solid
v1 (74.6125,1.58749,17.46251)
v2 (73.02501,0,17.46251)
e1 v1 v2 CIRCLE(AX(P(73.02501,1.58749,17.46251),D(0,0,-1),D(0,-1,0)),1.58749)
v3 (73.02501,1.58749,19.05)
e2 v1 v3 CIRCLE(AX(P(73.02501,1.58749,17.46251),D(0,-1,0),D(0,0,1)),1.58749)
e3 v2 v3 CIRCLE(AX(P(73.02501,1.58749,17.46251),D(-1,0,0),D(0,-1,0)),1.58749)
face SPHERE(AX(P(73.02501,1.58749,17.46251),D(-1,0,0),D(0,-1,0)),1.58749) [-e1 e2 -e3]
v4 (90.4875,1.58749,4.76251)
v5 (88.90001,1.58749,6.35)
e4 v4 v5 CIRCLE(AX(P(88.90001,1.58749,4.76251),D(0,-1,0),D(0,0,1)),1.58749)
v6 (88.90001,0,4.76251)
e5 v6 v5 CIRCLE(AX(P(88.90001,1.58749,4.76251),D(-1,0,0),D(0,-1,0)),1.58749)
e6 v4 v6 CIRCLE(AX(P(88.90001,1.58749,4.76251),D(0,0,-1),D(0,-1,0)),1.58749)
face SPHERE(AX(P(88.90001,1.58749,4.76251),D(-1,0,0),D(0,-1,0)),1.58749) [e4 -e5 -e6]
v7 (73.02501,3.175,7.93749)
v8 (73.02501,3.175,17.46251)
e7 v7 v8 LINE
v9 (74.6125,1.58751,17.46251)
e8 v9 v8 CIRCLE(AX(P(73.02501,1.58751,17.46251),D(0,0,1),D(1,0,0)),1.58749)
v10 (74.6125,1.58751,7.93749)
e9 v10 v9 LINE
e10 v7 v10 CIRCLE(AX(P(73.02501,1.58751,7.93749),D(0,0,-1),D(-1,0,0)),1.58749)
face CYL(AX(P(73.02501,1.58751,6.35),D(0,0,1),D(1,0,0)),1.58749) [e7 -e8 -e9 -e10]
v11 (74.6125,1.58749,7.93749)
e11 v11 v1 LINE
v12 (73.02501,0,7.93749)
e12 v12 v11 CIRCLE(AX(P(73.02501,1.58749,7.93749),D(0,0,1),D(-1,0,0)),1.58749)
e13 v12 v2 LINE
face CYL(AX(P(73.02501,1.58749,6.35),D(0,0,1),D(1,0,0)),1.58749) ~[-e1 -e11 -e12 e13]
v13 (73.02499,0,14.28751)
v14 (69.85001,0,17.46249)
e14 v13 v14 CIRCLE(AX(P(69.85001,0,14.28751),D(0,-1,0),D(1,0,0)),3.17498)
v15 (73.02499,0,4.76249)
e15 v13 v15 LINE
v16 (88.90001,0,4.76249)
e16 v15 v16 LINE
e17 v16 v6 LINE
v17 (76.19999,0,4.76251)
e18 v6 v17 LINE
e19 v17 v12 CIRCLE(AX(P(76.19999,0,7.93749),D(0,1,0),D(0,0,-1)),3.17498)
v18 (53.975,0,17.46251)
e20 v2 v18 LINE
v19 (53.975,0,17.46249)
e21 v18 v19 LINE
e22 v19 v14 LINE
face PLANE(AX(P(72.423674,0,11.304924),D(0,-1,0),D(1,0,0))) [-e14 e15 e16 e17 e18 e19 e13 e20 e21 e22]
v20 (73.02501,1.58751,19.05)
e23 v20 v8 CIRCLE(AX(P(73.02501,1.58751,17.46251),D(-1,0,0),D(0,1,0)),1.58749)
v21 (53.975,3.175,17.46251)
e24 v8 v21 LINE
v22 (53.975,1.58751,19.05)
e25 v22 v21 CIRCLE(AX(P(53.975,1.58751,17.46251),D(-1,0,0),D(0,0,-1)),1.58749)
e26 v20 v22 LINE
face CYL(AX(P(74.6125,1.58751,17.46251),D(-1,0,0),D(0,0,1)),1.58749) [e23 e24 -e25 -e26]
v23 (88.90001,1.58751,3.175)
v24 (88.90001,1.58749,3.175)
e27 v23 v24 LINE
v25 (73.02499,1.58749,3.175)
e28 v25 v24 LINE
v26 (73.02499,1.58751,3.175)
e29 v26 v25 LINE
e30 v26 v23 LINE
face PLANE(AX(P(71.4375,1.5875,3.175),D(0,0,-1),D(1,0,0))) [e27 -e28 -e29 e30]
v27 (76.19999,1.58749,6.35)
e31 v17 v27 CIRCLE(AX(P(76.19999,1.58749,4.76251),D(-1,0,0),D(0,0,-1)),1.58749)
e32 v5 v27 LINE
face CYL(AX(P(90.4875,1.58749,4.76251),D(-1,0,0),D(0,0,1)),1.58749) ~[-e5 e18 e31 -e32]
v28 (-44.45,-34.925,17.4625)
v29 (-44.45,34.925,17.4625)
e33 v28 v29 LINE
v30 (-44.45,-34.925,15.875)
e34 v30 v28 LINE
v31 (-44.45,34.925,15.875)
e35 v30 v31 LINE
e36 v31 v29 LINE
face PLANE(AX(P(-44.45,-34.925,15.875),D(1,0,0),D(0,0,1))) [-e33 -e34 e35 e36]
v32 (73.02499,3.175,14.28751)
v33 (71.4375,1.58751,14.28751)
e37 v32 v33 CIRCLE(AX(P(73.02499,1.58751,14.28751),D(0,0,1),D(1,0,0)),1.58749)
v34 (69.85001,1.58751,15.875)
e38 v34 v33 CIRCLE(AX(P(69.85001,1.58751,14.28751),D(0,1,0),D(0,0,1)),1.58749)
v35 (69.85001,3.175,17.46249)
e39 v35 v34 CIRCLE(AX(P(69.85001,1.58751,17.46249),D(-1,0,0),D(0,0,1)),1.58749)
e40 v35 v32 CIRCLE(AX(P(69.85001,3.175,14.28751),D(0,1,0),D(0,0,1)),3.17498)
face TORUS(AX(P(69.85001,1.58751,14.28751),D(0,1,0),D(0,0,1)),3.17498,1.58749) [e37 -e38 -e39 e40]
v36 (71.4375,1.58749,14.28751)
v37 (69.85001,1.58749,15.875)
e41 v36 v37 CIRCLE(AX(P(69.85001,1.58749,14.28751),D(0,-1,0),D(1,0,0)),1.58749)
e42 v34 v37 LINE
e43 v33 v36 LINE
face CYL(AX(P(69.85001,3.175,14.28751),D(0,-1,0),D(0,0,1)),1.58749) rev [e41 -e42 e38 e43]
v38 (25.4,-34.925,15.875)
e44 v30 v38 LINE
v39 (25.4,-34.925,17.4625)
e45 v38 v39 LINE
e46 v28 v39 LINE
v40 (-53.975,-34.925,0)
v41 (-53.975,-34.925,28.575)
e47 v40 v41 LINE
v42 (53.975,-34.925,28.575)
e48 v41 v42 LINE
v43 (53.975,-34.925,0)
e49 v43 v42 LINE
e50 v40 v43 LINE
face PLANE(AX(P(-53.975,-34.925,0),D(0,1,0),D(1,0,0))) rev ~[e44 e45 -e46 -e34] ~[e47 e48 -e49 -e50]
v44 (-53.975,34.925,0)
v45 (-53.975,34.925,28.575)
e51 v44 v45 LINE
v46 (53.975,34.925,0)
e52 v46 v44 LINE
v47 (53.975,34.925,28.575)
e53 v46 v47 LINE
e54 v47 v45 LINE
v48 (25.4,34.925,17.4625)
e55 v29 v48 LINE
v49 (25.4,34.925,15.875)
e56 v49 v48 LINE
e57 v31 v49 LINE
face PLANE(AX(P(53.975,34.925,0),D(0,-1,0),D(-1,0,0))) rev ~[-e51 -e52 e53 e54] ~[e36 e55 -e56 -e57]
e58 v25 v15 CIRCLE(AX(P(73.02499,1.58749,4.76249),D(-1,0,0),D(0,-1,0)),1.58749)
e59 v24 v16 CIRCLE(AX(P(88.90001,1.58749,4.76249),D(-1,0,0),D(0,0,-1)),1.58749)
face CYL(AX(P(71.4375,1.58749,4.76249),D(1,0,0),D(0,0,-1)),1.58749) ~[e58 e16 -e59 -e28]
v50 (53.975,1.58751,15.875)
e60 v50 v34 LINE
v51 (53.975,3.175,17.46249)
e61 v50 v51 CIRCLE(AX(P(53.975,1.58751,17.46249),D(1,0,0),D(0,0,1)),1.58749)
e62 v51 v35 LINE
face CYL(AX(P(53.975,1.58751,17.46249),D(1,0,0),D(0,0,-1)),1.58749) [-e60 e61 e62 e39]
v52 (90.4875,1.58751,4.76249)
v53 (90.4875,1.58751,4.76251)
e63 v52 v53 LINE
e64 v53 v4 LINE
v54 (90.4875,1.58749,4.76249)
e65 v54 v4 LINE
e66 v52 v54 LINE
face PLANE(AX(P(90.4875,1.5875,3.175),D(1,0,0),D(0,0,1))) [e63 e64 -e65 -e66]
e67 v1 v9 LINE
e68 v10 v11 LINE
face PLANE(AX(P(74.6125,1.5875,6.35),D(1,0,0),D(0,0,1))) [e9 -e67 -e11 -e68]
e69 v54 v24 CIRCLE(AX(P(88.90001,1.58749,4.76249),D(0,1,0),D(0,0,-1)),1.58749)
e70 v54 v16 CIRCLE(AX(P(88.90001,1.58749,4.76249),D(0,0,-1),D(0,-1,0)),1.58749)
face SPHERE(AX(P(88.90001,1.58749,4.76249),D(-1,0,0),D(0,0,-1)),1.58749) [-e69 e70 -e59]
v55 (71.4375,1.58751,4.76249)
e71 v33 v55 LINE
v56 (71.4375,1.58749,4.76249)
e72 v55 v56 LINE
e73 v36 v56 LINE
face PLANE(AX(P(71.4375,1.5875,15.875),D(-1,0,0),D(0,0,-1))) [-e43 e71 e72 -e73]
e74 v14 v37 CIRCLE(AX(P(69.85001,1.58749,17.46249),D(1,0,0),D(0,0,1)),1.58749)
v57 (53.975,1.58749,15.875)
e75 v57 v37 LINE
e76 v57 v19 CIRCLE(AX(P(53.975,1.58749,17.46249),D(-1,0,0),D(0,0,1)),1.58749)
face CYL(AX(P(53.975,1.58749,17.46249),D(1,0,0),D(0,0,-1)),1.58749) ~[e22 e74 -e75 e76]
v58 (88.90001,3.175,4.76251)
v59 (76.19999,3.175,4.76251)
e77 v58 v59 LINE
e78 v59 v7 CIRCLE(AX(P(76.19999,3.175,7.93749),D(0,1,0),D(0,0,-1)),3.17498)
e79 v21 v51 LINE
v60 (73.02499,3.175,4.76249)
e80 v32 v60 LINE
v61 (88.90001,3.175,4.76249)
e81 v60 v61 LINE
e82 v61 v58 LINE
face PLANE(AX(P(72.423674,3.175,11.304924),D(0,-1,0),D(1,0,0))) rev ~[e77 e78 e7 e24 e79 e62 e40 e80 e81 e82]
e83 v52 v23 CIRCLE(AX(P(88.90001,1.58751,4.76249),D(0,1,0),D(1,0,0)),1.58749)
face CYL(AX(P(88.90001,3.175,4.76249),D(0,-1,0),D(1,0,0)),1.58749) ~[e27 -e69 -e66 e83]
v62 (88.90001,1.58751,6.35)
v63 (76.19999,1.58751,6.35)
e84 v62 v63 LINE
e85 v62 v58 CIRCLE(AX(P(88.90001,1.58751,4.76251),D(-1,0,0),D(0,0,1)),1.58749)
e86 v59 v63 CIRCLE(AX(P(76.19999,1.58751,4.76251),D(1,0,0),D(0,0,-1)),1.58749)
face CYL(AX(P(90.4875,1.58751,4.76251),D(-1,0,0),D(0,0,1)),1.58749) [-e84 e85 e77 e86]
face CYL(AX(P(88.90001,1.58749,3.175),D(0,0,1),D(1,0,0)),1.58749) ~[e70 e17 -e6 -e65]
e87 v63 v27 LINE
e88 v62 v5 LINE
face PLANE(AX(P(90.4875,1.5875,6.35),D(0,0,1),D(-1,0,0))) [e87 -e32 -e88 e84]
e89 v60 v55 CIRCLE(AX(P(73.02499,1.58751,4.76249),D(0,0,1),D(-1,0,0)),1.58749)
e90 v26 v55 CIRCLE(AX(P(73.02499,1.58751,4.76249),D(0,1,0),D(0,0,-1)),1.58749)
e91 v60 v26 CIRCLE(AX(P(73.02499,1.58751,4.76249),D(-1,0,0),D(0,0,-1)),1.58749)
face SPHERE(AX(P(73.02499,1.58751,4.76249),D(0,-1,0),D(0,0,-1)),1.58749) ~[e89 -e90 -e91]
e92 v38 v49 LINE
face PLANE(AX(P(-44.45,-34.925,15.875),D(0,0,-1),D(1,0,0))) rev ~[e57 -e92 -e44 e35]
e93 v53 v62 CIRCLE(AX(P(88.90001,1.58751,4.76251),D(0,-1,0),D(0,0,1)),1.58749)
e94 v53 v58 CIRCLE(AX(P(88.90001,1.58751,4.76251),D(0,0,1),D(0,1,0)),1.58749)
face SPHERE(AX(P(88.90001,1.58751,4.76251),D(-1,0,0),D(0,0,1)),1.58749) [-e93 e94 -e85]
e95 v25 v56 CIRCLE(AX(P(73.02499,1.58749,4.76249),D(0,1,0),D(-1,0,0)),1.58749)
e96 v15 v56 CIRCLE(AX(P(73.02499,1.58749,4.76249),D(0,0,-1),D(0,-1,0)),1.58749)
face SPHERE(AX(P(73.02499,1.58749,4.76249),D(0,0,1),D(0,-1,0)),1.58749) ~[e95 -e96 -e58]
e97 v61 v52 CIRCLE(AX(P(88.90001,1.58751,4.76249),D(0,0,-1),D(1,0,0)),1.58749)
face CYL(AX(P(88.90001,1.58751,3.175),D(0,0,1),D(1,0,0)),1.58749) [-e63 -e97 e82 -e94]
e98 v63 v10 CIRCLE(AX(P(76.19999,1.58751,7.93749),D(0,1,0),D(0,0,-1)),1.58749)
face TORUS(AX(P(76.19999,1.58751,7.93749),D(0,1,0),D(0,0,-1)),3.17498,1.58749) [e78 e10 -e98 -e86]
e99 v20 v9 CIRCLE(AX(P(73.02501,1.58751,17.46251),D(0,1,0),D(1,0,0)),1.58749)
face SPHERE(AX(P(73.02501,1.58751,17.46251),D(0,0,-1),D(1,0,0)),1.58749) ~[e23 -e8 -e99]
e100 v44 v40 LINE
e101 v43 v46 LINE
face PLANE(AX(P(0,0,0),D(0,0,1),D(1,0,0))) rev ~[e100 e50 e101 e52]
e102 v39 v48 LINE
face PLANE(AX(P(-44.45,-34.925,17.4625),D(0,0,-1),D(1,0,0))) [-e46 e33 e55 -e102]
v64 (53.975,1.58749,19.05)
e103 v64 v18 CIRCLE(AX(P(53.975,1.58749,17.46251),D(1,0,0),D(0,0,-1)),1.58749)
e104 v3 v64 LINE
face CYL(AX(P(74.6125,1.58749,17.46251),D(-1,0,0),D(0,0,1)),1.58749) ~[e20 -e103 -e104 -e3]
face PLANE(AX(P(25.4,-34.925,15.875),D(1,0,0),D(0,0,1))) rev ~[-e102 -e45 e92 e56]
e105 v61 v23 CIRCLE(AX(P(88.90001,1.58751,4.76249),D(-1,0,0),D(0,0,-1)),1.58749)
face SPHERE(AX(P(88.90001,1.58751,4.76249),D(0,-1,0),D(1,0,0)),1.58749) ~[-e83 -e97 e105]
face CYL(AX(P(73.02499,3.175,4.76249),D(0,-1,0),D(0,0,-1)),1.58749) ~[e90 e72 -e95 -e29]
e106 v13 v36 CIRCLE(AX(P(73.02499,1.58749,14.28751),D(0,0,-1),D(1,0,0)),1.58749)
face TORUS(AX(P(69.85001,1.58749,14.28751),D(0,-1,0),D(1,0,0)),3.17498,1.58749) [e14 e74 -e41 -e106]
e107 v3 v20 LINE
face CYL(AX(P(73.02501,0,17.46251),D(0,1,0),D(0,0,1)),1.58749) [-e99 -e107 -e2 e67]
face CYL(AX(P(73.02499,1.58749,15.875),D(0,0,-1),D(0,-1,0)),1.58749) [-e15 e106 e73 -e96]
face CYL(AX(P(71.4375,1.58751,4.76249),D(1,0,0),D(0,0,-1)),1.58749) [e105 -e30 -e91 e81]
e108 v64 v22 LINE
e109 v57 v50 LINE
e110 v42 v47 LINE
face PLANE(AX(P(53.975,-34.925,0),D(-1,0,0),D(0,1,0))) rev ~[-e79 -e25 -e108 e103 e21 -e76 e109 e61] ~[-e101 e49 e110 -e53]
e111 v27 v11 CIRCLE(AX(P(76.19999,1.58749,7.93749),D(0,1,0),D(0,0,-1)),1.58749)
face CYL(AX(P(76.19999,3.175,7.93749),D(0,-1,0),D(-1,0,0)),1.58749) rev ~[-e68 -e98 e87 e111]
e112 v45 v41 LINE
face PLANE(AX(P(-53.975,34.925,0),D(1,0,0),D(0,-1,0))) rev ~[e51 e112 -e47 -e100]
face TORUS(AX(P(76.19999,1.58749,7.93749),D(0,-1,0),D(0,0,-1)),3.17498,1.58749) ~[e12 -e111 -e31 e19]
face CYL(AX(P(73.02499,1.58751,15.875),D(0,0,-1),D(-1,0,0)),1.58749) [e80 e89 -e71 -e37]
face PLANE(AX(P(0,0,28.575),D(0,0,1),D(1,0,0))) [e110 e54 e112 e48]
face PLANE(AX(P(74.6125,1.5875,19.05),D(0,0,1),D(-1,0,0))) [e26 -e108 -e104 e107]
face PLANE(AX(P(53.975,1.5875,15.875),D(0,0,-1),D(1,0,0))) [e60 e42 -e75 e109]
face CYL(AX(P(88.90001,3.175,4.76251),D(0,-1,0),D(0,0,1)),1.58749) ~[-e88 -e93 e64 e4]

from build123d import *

# Parameters (mm, degrees)
F1_DEPTH      = 28.575
F2_W          = 69.85
F2_H          = 1.5875
F3_DEPTH      = 69.85
F6_DEPTH      = 1.5875
F6_DEPTH_BACK = 1.5875
F7_R          = 1.58749


# Not quite as in the source:
# - a fillet or chamfer is up to 0.001 mm smaller than in the source, because OpenCascade refuses the exact size


with BuildPart() as f1:
    # F0 (on Top) → F1 (new body)
    with BuildSketch(Plane.XY):
        Polygon((53.975, -34.925), (53.975, 0), (53.975, 34.925), (-53.975, 34.925), (-53.975, -34.925), align=None)
    extrude(amount=F1_DEPTH)

    # F2 (on face) → F3 (cut, through all)
    with BuildSketch(Plane.XZ.offset(34.925)):
        with Locations((-9.525, 16.66875)):
            Rectangle(F2_W, F2_H)
    extrude(amount=-F3_DEPTH, mode=Mode.SUBTRACT)

    # F5 (on offset) → F6 (join, two sides)
    with BuildSketch(Plane.XZ.offset(-1.5875)) as f6_sk:
        Polygon((53.975, 19.05), (53.975, 15.875), (71.4375, 15.875), (71.4375, 3.175), (90.4875, 3.175), (90.4875, 6.35), (74.6125, 6.35), (74.6125, 19.05), align=None)
    extrude(amount=F6_DEPTH)
    extrude(f6_sk.sketch, amount=-F6_DEPTH_BACK)

    # F7 (radius 1.5875 in the source; OpenCascade refuses exactly that, so slightly less here)
    f7_edges = [f1.edges().sort_by_distance(p)[0] for p in [
        (64.29375, 0, 19.05),
        (74.6125, 3.175, 12.7),
        (74.6125, 0, 12.7),
        (74.6125, 1.5875, 19.05),
        (74.6125, 1.5875, 6.35),
        (71.4375, 0, 9.525),
        (62.70625, 0, 15.875),
        (64.29375, 3.175, 19.05),
        (82.55, 3.175, 6.35),
        (82.55, 0, 6.35),
        (80.9625, 0, 3.175),
        (90.4875, 1.5875, 3.175),
        (90.4875, 0, 4.7625),
        (90.4875, 1.5875, 6.35),
        (90.4875, 3.175, 4.7625),
        (62.70625, 3.175, 15.875),
        (71.4375, 1.5875, 3.175),
        (80.9625, 3.175, 3.175),
        (71.4375, 3.175, 9.525),
        (71.4375, 1.5875, 15.875),
    ]]
    fillet(f7_edges, radius=F7_R)


solid = f1.part
